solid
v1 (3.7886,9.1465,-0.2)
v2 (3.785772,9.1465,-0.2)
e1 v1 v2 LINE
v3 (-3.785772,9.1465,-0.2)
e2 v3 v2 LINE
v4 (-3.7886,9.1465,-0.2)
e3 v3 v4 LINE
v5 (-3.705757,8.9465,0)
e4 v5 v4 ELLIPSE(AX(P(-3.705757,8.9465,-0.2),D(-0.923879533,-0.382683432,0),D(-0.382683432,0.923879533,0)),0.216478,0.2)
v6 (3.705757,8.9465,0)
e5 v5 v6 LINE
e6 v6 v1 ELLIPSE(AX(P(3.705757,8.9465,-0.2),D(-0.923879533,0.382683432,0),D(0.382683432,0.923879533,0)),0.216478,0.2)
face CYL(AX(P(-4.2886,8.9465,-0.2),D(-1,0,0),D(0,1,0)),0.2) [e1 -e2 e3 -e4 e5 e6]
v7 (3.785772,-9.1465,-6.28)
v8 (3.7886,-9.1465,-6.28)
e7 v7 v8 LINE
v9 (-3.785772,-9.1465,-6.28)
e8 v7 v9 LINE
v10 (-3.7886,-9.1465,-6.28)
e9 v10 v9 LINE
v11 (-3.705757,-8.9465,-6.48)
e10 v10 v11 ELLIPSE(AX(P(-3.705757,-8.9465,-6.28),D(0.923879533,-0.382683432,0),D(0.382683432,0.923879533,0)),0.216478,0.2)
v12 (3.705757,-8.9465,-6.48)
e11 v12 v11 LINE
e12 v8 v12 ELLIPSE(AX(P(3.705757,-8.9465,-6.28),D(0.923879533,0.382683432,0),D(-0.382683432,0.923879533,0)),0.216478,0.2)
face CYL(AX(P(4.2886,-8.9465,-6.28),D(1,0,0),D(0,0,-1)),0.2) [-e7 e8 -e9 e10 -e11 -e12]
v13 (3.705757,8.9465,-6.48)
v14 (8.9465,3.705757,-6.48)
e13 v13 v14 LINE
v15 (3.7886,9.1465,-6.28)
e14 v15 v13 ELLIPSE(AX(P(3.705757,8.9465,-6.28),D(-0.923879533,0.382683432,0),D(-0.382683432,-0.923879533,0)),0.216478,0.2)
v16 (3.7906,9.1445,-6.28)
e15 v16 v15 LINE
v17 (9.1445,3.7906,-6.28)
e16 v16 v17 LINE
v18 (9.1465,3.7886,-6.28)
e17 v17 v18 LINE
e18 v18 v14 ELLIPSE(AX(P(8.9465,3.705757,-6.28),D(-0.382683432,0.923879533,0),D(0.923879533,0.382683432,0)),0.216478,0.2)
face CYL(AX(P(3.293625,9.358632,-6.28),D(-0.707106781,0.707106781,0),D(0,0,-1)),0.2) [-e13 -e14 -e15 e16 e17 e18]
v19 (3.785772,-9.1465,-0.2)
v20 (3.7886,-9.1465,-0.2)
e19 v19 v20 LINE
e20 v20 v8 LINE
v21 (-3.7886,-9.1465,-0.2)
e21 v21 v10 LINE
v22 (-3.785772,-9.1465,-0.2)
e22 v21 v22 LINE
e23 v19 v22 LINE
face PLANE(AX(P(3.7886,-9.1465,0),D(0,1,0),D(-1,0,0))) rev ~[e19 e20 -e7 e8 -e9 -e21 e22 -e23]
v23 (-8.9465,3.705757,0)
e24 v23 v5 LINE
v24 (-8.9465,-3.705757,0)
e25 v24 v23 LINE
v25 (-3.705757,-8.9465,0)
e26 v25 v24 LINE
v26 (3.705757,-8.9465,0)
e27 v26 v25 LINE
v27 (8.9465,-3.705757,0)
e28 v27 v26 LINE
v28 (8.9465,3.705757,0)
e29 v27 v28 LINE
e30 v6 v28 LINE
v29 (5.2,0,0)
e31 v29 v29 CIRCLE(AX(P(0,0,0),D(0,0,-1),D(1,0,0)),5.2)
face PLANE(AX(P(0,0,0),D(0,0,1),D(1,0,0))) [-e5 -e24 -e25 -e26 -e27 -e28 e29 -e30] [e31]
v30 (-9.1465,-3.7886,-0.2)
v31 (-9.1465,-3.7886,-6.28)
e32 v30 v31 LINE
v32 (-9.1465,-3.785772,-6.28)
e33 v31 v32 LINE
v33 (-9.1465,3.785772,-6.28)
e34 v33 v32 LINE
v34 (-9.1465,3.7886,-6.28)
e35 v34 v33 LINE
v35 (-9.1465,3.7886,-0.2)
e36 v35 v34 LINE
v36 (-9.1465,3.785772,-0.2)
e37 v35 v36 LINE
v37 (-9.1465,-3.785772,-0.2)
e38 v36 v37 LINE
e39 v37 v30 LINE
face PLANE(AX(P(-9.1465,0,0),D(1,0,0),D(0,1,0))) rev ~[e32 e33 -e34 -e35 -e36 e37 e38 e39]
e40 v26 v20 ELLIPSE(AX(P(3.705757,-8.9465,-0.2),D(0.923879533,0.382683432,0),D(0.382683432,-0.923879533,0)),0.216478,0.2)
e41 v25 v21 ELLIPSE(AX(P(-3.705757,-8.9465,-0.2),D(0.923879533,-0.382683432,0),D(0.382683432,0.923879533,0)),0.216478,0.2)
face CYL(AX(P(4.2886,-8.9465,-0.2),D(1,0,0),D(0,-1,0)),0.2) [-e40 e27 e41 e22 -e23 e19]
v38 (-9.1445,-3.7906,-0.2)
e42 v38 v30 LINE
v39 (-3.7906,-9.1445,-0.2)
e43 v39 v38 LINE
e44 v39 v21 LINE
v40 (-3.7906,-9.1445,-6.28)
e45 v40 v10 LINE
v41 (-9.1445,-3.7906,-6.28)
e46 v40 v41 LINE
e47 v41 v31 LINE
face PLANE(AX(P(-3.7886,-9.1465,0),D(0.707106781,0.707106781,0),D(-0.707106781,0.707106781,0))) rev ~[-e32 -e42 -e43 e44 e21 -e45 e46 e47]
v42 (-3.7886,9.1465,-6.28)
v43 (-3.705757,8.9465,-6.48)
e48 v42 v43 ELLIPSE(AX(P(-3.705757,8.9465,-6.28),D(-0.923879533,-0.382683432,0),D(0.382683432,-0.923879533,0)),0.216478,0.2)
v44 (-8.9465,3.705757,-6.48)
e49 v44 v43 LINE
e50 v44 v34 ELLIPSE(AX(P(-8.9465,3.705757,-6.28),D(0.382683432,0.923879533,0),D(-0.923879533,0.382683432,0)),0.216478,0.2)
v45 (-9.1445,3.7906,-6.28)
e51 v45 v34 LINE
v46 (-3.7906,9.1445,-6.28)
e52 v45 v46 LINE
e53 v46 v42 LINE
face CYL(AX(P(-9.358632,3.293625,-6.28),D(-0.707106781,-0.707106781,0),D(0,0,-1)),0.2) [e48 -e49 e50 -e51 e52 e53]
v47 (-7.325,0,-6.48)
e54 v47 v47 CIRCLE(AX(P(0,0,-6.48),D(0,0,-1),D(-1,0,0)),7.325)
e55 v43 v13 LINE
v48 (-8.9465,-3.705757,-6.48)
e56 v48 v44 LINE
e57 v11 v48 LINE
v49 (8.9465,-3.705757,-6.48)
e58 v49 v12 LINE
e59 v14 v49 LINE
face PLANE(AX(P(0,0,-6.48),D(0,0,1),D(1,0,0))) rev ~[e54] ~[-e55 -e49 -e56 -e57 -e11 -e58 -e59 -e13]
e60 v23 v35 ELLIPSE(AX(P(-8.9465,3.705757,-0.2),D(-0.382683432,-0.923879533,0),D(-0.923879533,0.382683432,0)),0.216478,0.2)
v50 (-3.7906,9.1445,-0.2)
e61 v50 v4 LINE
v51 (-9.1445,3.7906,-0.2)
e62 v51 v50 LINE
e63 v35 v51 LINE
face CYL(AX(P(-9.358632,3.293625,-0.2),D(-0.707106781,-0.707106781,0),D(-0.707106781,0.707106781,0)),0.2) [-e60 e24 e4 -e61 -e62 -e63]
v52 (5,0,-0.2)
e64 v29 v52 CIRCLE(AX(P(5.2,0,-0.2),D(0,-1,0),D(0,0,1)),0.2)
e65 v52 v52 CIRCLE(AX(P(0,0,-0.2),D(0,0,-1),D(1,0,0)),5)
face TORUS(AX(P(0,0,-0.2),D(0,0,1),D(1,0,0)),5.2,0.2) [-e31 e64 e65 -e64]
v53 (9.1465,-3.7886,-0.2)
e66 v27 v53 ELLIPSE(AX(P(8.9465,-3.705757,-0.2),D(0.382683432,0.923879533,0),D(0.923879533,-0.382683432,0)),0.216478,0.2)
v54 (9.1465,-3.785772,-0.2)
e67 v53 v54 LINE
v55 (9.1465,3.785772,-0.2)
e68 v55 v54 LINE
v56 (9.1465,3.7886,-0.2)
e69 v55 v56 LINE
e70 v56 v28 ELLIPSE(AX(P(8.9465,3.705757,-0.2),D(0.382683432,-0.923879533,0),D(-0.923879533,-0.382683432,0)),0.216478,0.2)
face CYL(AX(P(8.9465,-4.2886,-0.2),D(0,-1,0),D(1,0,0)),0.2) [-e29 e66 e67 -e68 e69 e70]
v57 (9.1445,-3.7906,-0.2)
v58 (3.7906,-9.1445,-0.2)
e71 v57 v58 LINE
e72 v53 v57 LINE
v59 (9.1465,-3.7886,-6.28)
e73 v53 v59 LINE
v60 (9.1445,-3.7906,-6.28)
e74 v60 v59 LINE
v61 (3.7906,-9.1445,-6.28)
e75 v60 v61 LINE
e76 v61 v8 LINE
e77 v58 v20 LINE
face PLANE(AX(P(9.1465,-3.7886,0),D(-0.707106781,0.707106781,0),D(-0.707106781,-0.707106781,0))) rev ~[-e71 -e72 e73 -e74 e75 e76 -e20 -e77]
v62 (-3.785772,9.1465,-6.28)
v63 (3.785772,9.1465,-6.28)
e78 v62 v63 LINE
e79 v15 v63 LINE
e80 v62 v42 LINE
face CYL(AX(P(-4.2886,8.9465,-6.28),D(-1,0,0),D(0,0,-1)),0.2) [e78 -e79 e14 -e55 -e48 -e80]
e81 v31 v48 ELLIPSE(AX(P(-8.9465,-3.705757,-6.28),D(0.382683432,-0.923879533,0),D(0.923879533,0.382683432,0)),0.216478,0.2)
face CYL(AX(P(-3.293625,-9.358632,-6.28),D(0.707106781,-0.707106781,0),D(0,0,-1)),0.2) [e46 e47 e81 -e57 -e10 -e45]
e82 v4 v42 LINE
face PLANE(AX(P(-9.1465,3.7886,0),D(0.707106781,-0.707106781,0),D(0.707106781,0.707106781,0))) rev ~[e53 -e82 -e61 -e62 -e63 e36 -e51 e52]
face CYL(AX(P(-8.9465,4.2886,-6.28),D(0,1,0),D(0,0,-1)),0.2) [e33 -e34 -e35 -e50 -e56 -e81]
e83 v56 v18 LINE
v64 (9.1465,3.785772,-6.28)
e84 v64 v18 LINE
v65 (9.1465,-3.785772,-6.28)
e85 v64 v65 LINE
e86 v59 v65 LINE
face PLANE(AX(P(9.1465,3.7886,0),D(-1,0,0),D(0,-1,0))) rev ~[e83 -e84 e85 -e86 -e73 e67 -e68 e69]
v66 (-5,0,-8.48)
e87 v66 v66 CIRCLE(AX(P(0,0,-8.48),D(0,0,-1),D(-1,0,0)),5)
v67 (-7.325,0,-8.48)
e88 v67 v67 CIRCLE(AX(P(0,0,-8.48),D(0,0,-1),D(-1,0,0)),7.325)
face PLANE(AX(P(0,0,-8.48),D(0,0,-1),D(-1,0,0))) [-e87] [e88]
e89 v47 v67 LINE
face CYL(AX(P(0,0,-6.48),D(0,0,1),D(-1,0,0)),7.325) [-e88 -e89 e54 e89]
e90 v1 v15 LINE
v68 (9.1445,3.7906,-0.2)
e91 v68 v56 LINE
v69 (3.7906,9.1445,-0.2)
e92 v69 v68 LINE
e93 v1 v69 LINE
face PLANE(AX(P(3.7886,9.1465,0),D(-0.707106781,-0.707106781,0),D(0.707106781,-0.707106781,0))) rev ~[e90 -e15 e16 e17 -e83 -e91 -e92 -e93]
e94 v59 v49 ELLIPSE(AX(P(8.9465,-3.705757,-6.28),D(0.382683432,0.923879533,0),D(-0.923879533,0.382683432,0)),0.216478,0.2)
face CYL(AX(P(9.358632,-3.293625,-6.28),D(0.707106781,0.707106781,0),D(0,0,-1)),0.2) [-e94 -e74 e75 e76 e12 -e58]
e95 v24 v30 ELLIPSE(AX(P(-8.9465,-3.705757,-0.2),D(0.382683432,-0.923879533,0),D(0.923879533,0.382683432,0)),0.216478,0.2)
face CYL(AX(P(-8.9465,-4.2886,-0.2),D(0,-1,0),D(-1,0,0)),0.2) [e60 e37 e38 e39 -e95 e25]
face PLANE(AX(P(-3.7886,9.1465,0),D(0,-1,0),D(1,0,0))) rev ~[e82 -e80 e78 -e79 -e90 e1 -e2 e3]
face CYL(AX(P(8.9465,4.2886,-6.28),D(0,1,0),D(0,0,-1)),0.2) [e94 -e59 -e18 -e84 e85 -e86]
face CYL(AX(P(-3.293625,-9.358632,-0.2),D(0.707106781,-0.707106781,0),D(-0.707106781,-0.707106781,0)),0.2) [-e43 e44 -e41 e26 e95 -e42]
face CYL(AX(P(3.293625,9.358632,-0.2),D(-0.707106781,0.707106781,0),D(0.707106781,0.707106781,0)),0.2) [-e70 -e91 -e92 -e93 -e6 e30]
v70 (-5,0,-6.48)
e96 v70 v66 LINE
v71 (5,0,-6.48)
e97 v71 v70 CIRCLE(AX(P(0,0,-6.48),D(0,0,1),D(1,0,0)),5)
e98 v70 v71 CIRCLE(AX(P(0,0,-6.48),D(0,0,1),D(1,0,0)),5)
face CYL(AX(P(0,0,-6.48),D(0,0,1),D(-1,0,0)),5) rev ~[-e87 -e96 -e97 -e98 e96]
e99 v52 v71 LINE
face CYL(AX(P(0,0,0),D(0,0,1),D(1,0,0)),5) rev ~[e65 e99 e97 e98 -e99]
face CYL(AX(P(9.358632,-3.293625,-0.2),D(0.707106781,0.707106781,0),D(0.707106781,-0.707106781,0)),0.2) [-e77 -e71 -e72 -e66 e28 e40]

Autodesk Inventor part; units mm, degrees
ref_plane "YZ Plane" through (0, 0, 0) normal (1, 0, 0) x (0, 1, 0)
ref_plane "XZ Plane" through (0, 0, 0) normal (0, 1, 0) x (-1, 0, 0)
ref_plane "XY Plane" through (0, 0, 0) normal (0, 0, 1) x (1, 0, 0)
sketch "Sketch1" plane through (0, 0, 0) normal (0, 0, 1) x (1, 0, 0)
  line L0 (-12.8051, 0) -> (12.8051, 0) projected
  line L1 (9.1465, -3.7886) -> (3.7886, -9.1465)
  line L2 (3.7886, -9.1465) -> (-3.7886, -9.1465)
  line L3 (-3.7886, -9.1465) -> (-9.1465, -3.7886)
  line L4 (-9.1465, -3.7886) -> (-9.1465, 3.7886)
  line L5 (-9.1465, 3.7886) -> (-3.7886, 9.1465)
  line L6 (-3.7886, 9.1465) -> (3.7886, 9.1465)
  line L7 (3.7886, 9.1465) -> (9.1465, 3.7886)
  line L8 (9.1465, 3.7886) -> (9.1465, -3.7886)
  circle A0 centre (0, 0) radius 5
  point P0 (9.1465, 0)
  dimension "d0" = 18.293
  dimension "d1" = 10
extrude "Extrusion1" add sketch "Sketch1" against normal blind 6.48 contours L4 L5 L6 L7 L8 L0 A0 | L0 A0 L8 L1 L2 L3 L4
sketch "Sketch2" plane through (0, 0, -6.48) normal (0, 0, -1) x (-1, 0, 0)
  circle A0 centre (0, 0) radius 5 projected
  circle A1 centre (0, 0) radius 7.325
  dimension "d4" = 14.65
extrude "Extrusion2" add sketch "Sketch2" along normal blind 2
fillet "Fillet1" radius 0.2 17 edges at (0, -9.1465, 0) (-6.4676, -6.4676, 0) (6.4676, -6.4676, 0) (9.1465, 0, 0) (6.4676, 6.4676, 0) (0, 9.1465, 0) (-6.4676, 6.4676, 0) (-9.1465, 0, 0) (9.1465, 0, -6.48) (6.4676, -6.4676, -6.48) (0, -9.1465, -6.48) (-6.4676, -6.4676, -6.48) (-9.1465, 0, -6.48) (-6.4676, 6.4676, -6.48) (0, 9.1465, -6.48) (6.4676, 6.4676, -6.48) (-5, 0, 0)
thread "Thread1" size "M10x1.5" class "6H" standard "ANSI Metric M Profile" full length
properties part number "202-11" material "Stainless Steel"
